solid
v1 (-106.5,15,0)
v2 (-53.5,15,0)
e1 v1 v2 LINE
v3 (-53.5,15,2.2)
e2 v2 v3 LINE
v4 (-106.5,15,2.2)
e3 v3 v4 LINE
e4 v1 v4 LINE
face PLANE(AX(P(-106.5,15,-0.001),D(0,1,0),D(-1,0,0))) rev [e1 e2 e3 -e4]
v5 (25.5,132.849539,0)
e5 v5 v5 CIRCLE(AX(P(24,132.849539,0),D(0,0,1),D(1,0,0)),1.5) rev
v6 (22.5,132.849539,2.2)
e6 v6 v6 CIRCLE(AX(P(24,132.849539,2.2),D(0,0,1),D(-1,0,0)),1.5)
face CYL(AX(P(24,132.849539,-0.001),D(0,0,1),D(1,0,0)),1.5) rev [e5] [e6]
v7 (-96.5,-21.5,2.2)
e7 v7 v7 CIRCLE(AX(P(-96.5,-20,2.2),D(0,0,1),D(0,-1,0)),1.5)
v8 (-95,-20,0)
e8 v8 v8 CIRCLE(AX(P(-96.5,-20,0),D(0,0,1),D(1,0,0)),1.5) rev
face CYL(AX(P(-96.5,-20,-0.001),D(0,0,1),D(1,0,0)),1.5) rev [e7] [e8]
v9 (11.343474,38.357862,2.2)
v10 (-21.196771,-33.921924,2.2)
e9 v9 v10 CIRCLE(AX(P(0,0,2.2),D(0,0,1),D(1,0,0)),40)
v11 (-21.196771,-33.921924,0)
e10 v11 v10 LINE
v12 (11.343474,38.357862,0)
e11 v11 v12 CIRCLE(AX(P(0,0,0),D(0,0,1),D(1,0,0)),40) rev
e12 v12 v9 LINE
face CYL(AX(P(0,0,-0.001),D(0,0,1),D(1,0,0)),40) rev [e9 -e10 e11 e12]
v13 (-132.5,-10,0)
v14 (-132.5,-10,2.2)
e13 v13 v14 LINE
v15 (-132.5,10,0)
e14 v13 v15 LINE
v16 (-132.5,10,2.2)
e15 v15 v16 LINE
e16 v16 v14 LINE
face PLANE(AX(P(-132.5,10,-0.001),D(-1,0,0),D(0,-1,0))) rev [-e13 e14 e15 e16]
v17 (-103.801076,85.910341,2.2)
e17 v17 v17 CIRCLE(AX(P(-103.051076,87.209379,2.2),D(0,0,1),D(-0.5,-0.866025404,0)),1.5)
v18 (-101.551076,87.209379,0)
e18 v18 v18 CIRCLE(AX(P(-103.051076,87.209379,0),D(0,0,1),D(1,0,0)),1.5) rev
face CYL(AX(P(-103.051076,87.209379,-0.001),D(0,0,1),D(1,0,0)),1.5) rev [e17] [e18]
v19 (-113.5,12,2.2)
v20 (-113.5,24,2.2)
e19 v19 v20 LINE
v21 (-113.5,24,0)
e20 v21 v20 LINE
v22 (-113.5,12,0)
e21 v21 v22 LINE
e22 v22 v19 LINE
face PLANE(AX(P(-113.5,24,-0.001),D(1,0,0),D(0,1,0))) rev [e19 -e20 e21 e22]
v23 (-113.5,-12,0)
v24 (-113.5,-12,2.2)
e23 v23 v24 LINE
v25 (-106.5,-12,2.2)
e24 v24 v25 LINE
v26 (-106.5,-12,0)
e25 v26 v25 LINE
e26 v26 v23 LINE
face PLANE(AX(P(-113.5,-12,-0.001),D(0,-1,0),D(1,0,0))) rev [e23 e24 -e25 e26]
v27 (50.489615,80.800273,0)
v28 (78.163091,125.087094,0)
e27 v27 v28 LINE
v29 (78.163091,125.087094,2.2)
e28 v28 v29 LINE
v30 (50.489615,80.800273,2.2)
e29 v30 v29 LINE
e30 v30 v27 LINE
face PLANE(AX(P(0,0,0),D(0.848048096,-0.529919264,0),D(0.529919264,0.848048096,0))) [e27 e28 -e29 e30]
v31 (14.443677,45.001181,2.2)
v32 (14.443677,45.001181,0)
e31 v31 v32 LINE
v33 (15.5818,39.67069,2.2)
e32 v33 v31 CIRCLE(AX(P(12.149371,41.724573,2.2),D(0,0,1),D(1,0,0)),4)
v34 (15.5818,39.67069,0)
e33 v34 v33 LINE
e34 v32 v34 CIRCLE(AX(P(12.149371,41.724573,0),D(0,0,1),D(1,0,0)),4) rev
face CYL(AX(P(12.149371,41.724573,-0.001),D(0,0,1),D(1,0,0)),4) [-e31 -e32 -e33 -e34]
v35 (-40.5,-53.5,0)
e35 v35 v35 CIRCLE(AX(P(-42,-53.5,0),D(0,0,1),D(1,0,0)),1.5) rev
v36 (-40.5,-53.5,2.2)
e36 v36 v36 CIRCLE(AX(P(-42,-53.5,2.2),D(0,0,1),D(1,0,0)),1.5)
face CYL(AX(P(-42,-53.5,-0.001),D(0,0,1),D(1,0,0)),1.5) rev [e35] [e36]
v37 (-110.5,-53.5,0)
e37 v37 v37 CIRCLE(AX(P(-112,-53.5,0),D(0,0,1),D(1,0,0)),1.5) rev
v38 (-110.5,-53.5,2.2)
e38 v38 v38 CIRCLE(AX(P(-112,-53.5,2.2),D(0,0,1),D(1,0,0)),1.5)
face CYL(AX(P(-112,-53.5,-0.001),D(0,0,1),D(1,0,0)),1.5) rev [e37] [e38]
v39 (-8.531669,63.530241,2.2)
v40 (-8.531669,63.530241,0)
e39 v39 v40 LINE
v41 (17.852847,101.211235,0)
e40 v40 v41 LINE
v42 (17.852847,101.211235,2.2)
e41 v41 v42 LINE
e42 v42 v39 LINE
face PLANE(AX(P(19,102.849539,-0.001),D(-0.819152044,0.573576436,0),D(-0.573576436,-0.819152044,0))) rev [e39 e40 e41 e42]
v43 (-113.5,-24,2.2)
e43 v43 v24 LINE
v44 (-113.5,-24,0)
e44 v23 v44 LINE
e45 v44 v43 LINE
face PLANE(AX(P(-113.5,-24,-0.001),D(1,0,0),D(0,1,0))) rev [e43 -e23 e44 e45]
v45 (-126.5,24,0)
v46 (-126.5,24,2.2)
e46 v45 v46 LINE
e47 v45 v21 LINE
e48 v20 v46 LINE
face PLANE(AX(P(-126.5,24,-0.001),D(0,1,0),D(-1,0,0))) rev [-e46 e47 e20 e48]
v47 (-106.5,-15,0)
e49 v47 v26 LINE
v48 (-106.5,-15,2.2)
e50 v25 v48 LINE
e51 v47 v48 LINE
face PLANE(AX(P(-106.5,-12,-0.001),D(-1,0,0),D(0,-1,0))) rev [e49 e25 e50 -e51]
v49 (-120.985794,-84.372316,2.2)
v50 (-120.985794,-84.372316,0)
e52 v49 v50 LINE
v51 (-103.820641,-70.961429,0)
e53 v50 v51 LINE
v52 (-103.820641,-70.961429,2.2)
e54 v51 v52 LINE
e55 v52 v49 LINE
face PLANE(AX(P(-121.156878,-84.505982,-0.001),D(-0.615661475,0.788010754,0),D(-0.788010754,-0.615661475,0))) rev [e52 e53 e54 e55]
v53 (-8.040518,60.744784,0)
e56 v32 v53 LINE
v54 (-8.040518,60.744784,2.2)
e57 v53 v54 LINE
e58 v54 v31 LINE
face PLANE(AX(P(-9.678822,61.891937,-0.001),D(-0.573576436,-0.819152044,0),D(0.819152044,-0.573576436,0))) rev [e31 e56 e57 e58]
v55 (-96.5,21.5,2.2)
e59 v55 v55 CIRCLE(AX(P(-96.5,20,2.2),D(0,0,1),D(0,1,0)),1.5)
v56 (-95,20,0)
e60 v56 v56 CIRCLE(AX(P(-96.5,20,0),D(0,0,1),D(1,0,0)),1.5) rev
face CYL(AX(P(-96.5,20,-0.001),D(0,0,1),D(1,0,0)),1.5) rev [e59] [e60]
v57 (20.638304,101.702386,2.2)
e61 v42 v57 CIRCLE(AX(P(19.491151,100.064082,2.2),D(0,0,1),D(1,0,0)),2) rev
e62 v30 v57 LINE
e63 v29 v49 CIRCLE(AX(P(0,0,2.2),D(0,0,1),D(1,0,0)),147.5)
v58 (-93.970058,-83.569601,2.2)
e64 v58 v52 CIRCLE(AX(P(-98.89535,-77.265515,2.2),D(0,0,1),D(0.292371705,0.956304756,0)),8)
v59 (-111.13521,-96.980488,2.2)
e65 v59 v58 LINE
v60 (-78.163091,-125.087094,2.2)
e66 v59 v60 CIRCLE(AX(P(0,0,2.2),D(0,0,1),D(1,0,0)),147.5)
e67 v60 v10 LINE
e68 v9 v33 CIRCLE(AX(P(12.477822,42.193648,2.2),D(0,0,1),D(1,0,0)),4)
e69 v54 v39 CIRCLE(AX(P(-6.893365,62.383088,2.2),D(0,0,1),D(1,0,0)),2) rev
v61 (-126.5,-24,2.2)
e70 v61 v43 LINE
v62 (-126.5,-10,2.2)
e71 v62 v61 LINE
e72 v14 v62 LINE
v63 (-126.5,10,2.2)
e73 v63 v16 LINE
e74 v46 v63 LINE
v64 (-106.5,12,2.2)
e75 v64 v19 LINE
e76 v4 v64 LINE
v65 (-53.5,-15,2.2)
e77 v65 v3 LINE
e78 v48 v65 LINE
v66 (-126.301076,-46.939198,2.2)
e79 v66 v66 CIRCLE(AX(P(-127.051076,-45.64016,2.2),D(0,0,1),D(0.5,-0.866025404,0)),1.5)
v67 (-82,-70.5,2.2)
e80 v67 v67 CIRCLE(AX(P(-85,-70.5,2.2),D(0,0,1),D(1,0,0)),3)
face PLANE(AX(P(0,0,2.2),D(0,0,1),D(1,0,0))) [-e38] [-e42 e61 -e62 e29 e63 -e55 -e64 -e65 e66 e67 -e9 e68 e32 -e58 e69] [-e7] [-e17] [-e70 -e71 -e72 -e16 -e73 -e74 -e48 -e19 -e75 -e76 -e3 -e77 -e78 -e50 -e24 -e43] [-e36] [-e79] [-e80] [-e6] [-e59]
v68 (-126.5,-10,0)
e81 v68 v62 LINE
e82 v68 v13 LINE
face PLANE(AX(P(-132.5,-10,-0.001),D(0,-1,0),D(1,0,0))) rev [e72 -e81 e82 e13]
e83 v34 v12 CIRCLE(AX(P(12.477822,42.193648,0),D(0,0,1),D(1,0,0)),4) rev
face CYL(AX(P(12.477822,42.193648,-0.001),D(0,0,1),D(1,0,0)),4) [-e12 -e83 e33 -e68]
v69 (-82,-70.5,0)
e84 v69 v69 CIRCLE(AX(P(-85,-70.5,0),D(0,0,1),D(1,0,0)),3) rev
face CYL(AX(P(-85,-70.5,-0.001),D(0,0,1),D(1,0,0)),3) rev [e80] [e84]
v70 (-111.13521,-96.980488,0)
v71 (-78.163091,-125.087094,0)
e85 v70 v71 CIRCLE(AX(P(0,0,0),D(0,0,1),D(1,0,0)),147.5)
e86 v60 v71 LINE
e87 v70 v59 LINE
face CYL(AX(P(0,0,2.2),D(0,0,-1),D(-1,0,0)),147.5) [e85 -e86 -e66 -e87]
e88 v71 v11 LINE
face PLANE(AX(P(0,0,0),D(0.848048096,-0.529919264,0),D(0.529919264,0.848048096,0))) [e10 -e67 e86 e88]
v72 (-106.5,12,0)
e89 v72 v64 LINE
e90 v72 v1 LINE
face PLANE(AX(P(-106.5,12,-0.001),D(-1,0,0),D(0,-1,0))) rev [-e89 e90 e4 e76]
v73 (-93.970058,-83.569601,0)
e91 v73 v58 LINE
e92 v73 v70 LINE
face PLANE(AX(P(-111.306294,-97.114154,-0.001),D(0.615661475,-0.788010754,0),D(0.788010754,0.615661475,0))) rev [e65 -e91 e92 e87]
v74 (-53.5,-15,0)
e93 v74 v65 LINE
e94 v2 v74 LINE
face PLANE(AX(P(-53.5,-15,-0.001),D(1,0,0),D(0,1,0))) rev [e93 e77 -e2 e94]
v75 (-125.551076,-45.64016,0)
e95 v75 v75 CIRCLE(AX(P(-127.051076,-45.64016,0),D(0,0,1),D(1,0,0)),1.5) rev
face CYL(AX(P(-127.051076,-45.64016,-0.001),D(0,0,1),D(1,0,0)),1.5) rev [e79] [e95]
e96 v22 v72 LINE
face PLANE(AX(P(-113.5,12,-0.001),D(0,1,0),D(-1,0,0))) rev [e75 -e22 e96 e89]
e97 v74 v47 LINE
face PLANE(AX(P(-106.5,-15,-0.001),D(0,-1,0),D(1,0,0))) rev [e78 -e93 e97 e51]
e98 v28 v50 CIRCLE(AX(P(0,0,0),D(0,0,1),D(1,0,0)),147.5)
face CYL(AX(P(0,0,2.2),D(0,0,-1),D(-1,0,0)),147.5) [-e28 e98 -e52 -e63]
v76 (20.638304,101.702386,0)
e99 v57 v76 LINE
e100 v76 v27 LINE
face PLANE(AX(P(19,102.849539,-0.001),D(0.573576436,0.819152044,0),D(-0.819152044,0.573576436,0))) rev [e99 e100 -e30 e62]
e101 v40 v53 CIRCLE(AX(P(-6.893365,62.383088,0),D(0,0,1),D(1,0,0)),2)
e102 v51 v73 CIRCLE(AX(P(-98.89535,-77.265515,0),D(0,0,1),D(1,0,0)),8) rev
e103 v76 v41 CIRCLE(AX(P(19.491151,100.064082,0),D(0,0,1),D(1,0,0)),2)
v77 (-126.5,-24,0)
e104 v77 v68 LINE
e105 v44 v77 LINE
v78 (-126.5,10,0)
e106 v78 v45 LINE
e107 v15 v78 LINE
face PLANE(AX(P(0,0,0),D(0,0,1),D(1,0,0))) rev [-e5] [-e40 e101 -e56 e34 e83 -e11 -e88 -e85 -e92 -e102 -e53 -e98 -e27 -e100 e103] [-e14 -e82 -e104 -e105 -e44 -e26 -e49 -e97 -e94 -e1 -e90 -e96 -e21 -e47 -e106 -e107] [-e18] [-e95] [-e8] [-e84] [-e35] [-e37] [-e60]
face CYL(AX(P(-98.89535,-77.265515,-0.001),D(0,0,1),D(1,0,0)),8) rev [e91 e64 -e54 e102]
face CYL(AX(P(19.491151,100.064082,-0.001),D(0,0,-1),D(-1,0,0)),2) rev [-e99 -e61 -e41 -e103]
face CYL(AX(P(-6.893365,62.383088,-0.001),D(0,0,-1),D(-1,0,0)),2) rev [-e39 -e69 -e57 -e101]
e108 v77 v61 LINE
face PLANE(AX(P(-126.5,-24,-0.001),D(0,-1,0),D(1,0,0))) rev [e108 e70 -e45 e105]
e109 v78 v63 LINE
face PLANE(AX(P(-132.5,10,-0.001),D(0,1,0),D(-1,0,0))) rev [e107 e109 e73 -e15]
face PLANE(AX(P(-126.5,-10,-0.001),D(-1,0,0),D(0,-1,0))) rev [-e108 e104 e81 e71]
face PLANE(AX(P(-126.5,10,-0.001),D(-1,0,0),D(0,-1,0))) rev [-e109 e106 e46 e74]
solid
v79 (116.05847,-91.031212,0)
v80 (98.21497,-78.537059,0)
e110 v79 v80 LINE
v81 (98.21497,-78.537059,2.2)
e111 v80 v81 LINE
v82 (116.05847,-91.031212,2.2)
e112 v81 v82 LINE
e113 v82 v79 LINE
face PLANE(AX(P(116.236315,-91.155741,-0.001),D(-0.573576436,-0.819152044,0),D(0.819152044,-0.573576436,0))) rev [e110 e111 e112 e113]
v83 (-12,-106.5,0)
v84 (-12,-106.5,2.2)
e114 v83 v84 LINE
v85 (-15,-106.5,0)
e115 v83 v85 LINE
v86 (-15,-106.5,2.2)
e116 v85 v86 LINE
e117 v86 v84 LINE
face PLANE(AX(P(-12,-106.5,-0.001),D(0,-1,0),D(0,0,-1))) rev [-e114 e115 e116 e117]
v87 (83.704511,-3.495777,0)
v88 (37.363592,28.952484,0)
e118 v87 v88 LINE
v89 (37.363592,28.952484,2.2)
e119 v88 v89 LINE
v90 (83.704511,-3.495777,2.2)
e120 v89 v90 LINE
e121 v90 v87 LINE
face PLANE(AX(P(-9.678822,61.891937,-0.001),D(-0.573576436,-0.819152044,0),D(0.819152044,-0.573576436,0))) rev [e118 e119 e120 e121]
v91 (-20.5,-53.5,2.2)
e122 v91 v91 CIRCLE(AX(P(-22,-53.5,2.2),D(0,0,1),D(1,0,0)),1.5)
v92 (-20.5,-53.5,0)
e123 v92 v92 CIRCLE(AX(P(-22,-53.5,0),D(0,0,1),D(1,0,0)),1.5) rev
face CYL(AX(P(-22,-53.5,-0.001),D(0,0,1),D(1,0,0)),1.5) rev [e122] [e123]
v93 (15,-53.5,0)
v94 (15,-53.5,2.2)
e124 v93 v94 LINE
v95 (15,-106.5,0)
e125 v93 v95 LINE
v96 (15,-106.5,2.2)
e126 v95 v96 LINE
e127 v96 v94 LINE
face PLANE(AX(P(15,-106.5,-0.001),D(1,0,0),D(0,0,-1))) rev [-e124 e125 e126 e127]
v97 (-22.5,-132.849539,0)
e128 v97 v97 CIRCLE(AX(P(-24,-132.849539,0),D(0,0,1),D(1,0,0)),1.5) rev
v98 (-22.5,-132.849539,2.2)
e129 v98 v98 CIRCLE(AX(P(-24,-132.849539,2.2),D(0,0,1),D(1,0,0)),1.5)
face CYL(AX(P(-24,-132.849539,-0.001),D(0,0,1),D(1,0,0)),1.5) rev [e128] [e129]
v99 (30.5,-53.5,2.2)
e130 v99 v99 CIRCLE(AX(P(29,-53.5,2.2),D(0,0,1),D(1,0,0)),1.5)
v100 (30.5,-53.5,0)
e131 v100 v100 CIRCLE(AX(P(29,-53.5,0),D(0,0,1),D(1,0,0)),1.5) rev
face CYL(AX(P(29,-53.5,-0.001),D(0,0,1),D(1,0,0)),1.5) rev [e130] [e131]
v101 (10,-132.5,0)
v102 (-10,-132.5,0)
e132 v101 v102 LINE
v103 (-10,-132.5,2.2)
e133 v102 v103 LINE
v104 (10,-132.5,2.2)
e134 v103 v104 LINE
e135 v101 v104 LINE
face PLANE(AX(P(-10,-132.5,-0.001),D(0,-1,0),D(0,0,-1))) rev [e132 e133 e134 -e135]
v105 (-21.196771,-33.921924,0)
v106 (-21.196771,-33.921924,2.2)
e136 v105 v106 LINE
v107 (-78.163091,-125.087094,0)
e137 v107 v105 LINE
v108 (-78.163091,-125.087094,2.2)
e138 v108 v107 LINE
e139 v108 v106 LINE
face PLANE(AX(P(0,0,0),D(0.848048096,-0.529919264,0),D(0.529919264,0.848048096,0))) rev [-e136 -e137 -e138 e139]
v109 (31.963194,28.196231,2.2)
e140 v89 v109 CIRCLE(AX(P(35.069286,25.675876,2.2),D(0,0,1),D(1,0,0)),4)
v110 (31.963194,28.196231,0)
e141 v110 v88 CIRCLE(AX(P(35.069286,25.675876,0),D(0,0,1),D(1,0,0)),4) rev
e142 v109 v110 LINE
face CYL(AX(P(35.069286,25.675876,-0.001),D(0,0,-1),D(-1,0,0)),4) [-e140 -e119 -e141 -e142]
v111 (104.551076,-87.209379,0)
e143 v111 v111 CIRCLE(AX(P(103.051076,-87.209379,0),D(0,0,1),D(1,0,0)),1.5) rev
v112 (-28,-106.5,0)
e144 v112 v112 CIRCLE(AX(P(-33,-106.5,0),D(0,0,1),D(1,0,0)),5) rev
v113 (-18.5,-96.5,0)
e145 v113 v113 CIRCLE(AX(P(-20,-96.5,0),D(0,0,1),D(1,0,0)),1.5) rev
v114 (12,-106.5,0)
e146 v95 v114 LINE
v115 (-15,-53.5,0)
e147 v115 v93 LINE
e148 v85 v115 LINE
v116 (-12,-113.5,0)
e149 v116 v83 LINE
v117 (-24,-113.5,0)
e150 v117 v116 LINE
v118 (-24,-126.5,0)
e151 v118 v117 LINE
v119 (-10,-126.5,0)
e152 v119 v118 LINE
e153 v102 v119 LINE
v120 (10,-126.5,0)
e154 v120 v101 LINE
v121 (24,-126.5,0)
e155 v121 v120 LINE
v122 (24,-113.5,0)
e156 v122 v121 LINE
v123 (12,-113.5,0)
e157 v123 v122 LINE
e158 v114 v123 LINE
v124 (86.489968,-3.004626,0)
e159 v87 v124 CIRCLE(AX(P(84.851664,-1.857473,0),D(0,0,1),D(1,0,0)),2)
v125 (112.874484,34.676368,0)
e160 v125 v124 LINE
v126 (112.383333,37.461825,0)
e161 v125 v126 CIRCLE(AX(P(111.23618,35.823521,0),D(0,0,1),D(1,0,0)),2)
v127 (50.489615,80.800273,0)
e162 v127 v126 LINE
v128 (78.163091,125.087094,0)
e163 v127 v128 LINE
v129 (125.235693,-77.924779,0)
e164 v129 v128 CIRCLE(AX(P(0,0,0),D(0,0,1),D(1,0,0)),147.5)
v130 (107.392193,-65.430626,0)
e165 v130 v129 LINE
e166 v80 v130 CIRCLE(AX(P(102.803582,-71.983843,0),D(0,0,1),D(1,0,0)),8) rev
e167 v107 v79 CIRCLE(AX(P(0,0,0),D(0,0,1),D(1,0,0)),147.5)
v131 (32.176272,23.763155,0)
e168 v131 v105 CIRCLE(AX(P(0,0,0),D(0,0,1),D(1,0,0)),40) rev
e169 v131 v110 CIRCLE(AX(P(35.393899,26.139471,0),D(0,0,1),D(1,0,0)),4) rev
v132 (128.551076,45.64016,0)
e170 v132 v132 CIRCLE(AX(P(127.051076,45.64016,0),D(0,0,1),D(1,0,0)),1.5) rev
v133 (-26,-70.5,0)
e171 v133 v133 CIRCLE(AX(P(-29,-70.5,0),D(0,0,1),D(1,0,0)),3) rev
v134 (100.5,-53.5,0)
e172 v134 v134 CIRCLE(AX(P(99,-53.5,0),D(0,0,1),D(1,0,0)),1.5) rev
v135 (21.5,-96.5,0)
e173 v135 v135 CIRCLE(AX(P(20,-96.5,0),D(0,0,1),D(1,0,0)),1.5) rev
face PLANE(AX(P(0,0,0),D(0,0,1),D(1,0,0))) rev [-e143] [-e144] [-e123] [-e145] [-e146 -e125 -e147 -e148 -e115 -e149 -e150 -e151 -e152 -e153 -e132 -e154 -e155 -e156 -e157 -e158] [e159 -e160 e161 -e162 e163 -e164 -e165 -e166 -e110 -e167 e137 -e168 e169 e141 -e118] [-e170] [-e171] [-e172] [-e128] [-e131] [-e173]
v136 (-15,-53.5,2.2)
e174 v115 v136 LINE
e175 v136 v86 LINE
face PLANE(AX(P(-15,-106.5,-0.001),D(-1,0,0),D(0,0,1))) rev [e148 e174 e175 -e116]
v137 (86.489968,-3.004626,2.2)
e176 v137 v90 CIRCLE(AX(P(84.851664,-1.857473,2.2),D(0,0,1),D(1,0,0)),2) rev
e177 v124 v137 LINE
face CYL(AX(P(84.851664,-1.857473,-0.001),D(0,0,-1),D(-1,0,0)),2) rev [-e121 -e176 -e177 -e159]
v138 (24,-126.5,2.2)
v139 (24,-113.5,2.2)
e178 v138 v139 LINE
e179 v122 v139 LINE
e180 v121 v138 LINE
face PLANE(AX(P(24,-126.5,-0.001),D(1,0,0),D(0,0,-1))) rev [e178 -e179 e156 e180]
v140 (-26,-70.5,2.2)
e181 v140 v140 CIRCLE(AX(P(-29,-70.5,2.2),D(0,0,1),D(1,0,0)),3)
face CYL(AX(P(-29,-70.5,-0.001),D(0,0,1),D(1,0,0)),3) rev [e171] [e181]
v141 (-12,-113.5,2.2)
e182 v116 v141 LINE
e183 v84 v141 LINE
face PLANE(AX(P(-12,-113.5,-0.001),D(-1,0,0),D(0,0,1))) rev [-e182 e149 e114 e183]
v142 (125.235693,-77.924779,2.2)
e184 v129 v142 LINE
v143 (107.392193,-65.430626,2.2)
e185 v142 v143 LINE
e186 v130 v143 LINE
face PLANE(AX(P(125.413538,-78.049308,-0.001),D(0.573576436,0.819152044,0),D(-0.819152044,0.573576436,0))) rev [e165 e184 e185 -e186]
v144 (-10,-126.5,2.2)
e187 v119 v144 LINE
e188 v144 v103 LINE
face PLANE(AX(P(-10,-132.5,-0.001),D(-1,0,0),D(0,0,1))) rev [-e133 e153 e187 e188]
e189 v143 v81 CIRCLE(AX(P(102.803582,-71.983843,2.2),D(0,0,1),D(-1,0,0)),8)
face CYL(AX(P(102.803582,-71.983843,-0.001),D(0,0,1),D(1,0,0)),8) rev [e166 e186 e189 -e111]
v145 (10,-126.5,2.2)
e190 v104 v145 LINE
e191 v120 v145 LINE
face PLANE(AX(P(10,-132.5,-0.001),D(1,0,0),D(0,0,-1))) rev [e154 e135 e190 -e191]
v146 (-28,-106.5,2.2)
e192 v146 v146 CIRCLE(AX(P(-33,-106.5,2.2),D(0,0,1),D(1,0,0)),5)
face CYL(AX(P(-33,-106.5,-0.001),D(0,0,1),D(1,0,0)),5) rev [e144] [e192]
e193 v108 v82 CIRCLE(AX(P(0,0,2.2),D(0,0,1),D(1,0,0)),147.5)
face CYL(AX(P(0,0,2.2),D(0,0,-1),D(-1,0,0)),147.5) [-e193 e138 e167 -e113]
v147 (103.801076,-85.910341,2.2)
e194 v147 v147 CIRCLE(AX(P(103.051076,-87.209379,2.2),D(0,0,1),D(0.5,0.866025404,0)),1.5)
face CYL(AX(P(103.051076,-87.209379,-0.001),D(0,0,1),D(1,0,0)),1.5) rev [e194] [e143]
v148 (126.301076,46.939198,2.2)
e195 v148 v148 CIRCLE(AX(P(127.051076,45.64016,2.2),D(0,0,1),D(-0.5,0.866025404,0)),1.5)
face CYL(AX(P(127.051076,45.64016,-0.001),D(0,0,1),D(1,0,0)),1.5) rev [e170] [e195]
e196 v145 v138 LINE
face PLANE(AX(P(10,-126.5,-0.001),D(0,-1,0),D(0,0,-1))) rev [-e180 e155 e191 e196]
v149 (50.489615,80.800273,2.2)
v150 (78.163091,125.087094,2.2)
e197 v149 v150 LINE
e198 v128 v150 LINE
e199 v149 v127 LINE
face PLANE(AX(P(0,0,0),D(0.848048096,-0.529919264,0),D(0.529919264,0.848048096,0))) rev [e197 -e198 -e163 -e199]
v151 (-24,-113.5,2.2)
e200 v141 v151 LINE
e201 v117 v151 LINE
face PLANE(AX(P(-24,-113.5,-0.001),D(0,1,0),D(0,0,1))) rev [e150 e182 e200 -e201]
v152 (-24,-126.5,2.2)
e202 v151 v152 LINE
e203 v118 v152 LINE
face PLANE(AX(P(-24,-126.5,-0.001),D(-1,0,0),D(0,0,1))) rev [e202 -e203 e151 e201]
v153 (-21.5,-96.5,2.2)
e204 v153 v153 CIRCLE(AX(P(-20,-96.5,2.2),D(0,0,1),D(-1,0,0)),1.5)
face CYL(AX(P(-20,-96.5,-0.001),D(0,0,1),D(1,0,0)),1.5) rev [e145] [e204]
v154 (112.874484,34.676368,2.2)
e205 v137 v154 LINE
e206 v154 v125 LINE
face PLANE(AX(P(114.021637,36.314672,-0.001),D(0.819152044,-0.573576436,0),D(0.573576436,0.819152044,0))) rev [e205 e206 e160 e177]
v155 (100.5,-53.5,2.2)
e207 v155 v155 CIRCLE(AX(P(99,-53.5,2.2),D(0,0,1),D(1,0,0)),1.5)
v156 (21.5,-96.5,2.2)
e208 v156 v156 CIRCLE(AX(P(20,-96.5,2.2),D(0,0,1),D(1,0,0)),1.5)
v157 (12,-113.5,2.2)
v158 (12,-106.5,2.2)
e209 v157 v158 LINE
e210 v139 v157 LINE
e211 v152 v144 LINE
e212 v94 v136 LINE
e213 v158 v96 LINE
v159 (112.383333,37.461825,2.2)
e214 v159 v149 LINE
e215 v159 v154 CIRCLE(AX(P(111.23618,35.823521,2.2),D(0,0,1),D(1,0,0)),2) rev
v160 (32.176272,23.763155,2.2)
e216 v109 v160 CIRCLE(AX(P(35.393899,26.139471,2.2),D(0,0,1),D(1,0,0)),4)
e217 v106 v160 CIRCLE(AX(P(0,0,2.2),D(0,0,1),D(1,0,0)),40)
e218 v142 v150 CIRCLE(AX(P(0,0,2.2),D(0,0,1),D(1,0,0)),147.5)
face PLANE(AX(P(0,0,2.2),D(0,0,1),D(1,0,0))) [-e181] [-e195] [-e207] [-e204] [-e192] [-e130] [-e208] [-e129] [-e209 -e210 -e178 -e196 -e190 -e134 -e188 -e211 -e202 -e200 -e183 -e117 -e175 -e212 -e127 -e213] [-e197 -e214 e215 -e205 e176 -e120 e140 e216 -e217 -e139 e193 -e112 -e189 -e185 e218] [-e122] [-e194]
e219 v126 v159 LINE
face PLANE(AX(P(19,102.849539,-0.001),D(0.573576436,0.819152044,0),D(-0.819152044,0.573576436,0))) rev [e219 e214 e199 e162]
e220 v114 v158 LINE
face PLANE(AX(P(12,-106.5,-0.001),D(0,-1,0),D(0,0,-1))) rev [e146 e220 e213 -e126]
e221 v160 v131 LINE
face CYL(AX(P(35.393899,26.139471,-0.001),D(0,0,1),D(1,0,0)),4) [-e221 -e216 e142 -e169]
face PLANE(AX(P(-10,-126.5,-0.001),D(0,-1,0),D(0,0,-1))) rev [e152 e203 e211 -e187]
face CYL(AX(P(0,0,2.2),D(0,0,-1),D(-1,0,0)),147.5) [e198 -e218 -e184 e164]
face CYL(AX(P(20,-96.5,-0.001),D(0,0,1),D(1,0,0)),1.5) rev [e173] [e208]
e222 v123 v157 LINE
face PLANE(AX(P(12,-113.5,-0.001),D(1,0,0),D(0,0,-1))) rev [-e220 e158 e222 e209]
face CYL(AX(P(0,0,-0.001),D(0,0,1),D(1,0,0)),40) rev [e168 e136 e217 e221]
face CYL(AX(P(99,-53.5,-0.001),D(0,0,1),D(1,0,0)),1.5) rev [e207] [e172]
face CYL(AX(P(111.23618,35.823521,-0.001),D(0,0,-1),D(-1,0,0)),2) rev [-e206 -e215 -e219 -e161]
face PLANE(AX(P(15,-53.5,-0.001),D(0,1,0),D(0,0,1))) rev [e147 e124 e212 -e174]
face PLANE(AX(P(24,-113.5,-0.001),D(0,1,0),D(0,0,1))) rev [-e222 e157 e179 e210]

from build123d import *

# Parameters (mm, degrees)
SKETCH1_R           = 147.5
BOSS_EXTRUDE1_DEPTH = 2.2
CUT_EXTRUDE1_REACH  = 210.608
CUT_EXTRUDE2_REACH  = 210.608
SKETCH3_R           = 1.5
CIRPATTERN2_COUNT   = 2
CIRPATTERN2_ANGLE   = 90
CUT_EXTRUDE3_REACH  = 210.608
SKETCH4_R           = 1.5
CIRPATTERN3_COUNT   = 6
CUT_EXTRUDE4_REACH  = 210.608
SKETCH5_R           = 40
CUT_EXTRUDE5_REACH  = 210.608
SKETCH6_R           = 5
CUT_EXTRUDE6_REACH  = 210.608
SKETCH7_R           = 3
CUT_EXTRUDE7_REACH  = 210.608
SKETCH8_R           = 1.5
CUT_EXTRUDE8_REACH  = 210.608
CIRPATTERN4_COUNT   = 2
CIRPATTERN4_ANGLE   = 107
CUT_EXTRUDE9_REACH  = 210.608
CUT_EXTRUDE10_REACH = 210.608
FILLET2_R           = 4
FILLET3_R           = 2


# Read off the part's stored shape, not the designer's step: Split1
with BuildPart() as part:
    # Sketch1 → Boss-Extrude1 (new body)
    with BuildSketch(Plane.XY):
        Circle(SKETCH1_R)
    extrude(amount=BOSS_EXTRUDE1_DEPTH)

    # Sketch2 → Cut-Extrude1 (cut, up to next)
    with BuildSketch(Plane.XY.offset(2.2), mode=Mode.PRIVATE) as cut_extrude1_sk1:
        Polygon((-10, -132.5), (10, -132.5), (10, -126.5), (24, -126.5), (24, -113.5), (12, -113.5), (12, -106.5), (15, -106.5), (15, -53.5), (-15, -53.5), (-15, -106.5), (-12, -106.5), (-12, -113.5), (-24, -113.5), (-24, -126.5), (-10, -126.5), align=None)
    cut_extrude1_tool1 = extrude(cut_extrude1_sk1.sketch, amount=-CUT_EXTRUDE1_REACH, mode=Mode.PRIVATE) & part.part
    cut_extrude1 = cut_extrude1_tool1.solids().sort_by_distance((0, -94.364508, 2.2))[0]
    add(cut_extrude1, mode=Mode.SUBTRACT)

    # Sketch3 → Cut-Extrude2 (cut, up to next)
    with BuildSketch(Plane.XY.offset(2.2), mode=Mode.PRIVATE) as cut_extrude2_sk1:
        with Locations((20, -96.5)):
            Circle(SKETCH3_R)
    cut_extrude2_tool1 = extrude(cut_extrude2_sk1.sketch, amount=-CUT_EXTRUDE2_REACH, mode=Mode.PRIVATE) & part.part
    # Sketch3 → Cut-Extrude2 (cut, up to next)
    with BuildSketch(Plane.XY.offset(2.2), mode=Mode.PRIVATE) as cut_extrude2_sk2:
        with Locations((-20, -96.5)):
            Circle(SKETCH3_R)
    cut_extrude2_tool2 = extrude(cut_extrude2_sk2.sketch, amount=-CUT_EXTRUDE2_REACH, mode=Mode.PRIVATE) & part.part
    cut_extrude2_1 = cut_extrude2_tool1.solids().sort_by_distance((20, -96.5, 2.2))[0]
    add(cut_extrude2_1, mode=Mode.SUBTRACT)
    cut_extrude2_2 = cut_extrude2_tool2.solids().sort_by_distance((-20, -96.5, 2.2))[0]
    add(cut_extrude2_2, mode=Mode.SUBTRACT)
    cut_extrude2 = cut_extrude2_1 + cut_extrude2_2  # Cut-Extrude2 as one shape, for the pattern or mirror that repeats it

    # CirPattern2: Cut-Extrude1, Cut-Extrude2 ×2 about axis
    cirpattern2_axis = Axis((0, 0, 0), (0, 0, -1))
    add([cut_extrude1.rotate(cirpattern2_axis, i * CIRPATTERN2_ANGLE / (CIRPATTERN2_COUNT - 1)) for i in range(1, CIRPATTERN2_COUNT)], mode=Mode.SUBTRACT)
    add([cut_extrude2.rotate(cirpattern2_axis, i * CIRPATTERN2_ANGLE / (CIRPATTERN2_COUNT - 1)) for i in range(1, CIRPATTERN2_COUNT)], mode=Mode.SUBTRACT)

    # Sketch4 → Cut-Extrude3 (cut, up to next)
    with BuildSketch(Plane.XY.offset(2.2), mode=Mode.PRIVATE) as cut_extrude3_sk1:
        with Locations((-24, -132.849538953)):
            Circle(SKETCH4_R)
    cut_extrude3_tool1 = extrude(cut_extrude3_sk1.sketch, amount=-CUT_EXTRUDE3_REACH, mode=Mode.PRIVATE) & part.part
    cut_extrude3 = cut_extrude3_tool1.solids().sort_by_distance((-24, -132.849539, 2.2))[0]
    add(cut_extrude3, mode=Mode.SUBTRACT)

    # CirPattern3: Cut-Extrude3 ×6 about axis
    cirpattern3_axis = Axis((0, 0, 0), (0, 0, 1))
    for i in range(1, CIRPATTERN3_COUNT):
        add(cut_extrude3.rotate(cirpattern3_axis, i * 360 / CIRPATTERN3_COUNT), mode=Mode.SUBTRACT)

    # Sketch5 → Cut-Extrude4 (cut, up to next)
    with BuildSketch(Plane.XY.offset(2.2), mode=Mode.PRIVATE) as cut_extrude4_sk1:
        Circle(SKETCH5_R)
    cut_extrude4_tool1 = extrude(cut_extrude4_sk1.sketch, amount=-CUT_EXTRUDE4_REACH, mode=Mode.PRIVATE) & part.part
    add(cut_extrude4_tool1.solids().sort_by_distance((0, 0, 2.2))[0], mode=Mode.SUBTRACT)

    # Sketch6 → Cut-Extrude5 (cut, up to next)
    with BuildSketch(Plane.XY.offset(2.2), mode=Mode.PRIVATE) as cut_extrude5_sk1:
        with Locations((-33, -106.5)):
            Circle(SKETCH6_R)
    cut_extrude5_tool1 = extrude(cut_extrude5_sk1.sketch, amount=-CUT_EXTRUDE5_REACH, mode=Mode.PRIVATE) & part.part
    add(cut_extrude5_tool1.solids().sort_by_distance((-33, -106.5, 2.2))[0], mode=Mode.SUBTRACT)

    # Sketch7 → Cut-Extrude6 (cut, up to next)
    with BuildSketch(Plane.XY.offset(2.2), mode=Mode.PRIVATE) as cut_extrude6_sk1:
        with Locations((-29, -70.5)):
            Circle(SKETCH7_R)
    cut_extrude6_tool1 = extrude(cut_extrude6_sk1.sketch, amount=-CUT_EXTRUDE6_REACH, mode=Mode.PRIVATE) & part.part
    # Sketch7 → Cut-Extrude6 (cut, up to next)
    with BuildSketch(Plane.XY.offset(2.2), mode=Mode.PRIVATE) as cut_extrude6_sk2:
        with Locations((-85, -70.5)):
            Circle(SKETCH7_R)
    cut_extrude6_tool2 = extrude(cut_extrude6_sk2.sketch, amount=-CUT_EXTRUDE6_REACH, mode=Mode.PRIVATE) & part.part
    add(cut_extrude6_tool1.solids().sort_by_distance((-29, -70.5, 2.2))[0], mode=Mode.SUBTRACT)
    add(cut_extrude6_tool2.solids().sort_by_distance((-85, -70.5, 2.2))[0], mode=Mode.SUBTRACT)

    # Sketch8 → Cut-Extrude7 (cut, up to next)
    with BuildSketch(Plane.XY.offset(2.2), mode=Mode.PRIVATE) as cut_extrude7_sk1:
        with Locations((29, -53.5)):
            Circle(SKETCH8_R)
    cut_extrude7_tool1 = extrude(cut_extrude7_sk1.sketch, amount=-CUT_EXTRUDE7_REACH, mode=Mode.PRIVATE) & part.part
    # Sketch8 → Cut-Extrude7 (cut, up to next)
    with BuildSketch(Plane.XY.offset(2.2), mode=Mode.PRIVATE) as cut_extrude7_sk2:
        with Locations((99, -53.5)):
            Circle(SKETCH8_R)
    cut_extrude7_tool2 = extrude(cut_extrude7_sk2.sketch, amount=-CUT_EXTRUDE7_REACH, mode=Mode.PRIVATE) & part.part
    # Sketch8 → Cut-Extrude7 (cut, up to next)
    with BuildSketch(Plane.XY.offset(2.2), mode=Mode.PRIVATE) as cut_extrude7_sk3:
        with Locations((-22, -53.5)):
            Circle(SKETCH8_R)
    cut_extrude7_tool3 = extrude(cut_extrude7_sk3.sketch, amount=-CUT_EXTRUDE7_REACH, mode=Mode.PRIVATE) & part.part
    # Sketch8 → Cut-Extrude7 (cut, up to next)
    with BuildSketch(Plane.XY.offset(2.2), mode=Mode.PRIVATE) as cut_extrude7_sk4:
        with Locations((-42, -53.5)):
            Circle(SKETCH8_R)
    cut_extrude7_tool4 = extrude(cut_extrude7_sk4.sketch, amount=-CUT_EXTRUDE7_REACH, mode=Mode.PRIVATE) & part.part
    # Sketch8 → Cut-Extrude7 (cut, up to next)
    with BuildSketch(Plane.XY.offset(2.2), mode=Mode.PRIVATE) as cut_extrude7_sk5:
        with Locations((-112, -53.5)):
            Circle(SKETCH8_R)
    cut_extrude7_tool5 = extrude(cut_extrude7_sk5.sketch, amount=-CUT_EXTRUDE7_REACH, mode=Mode.PRIVATE) & part.part
    add(cut_extrude7_tool1.solids().sort_by_distance((29, -53.5, 2.2))[0], mode=Mode.SUBTRACT)
    add(cut_extrude7_tool2.solids().sort_by_distance((99, -53.5, 2.2))[0], mode=Mode.SUBTRACT)
    add(cut_extrude7_tool3.solids().sort_by_distance((-22, -53.5, 2.2))[0], mode=Mode.SUBTRACT)
    add(cut_extrude7_tool4.solids().sort_by_distance((-42, -53.5, 2.2))[0], mode=Mode.SUBTRACT)
    add(cut_extrude7_tool5.solids().sort_by_distance((-112, -53.5, 2.2))[0], mode=Mode.SUBTRACT)

    # Sketch9 → Cut-Extrude8 (cut, up to next)
    with BuildSketch(Plane.XY.offset(2.2), mode=Mode.PRIVATE) as cut_extrude8_sk1:
        with BuildLine():
            Line((116.236315042, -91.155740716), (125.413538023, -78.049308007))
            Line((125.413538023, -78.049308007), (107.392193049, -65.430626408))
            ThreePointArc((107.392193049, -65.430626408), (96.250365204, -67.395231271), (98.214970067, -78.537059116))
            Line((98.214970067, -78.537059116), (116.236315042, -91.155740716))
        make_face()
    cut_extrude8_tool1 = extrude(cut_extrude8_sk1.sketch, amount=-CUT_EXTRUDE8_REACH, mode=Mode.PRIVATE) & part.part
    cut_extrude8 = cut_extrude8_tool1.solids().sort_by_distance((109.194642, -76.458912, 2.2))[0]
    add(cut_extrude8, mode=Mode.SUBTRACT)

    # CirPattern4: Cut-Extrude8 ×2 about axis
    cirpattern4_axis = Axis((0, 0, 0), (0, 0, -1))
    for i in range(1, CIRPATTERN4_COUNT):
        add(cut_extrude8.rotate(cirpattern4_axis, i * CIRPATTERN4_ANGLE / (CIRPATTERN4_COUNT - 1)), mode=Mode.SUBTRACT)

    # Sketch10 → Cut-Extrude9 (cut, up to next)
    with BuildSketch(Plane.XY.offset(2.2), mode=Mode.PRIVATE) as cut_extrude9_sk1:
        Polygon((19, 102.849538953), (114.021637138, 36.314672336), (85.34281532, -4.642929878), (-9.678821818, 61.891936738), align=None)
    cut_extrude9_tool1 = extrude(cut_extrude9_sk1.sketch, amount=-CUT_EXTRUDE9_REACH, mode=Mode.PRIVATE) & part.part
    add(cut_extrude9_tool1.solids().sort_by_distance((52.171408, 49.103305, 2.2))[0], mode=Mode.SUBTRACT)

    # Sketch11 → Cut-Extrude10 (cut, up to next)
    with BuildSketch(Plane.XY.offset(2.2), mode=Mode.PRIVATE) as cut_extrude10_sk1:
        with BuildLine():
            Line((25.942740388, 37.050072974), (17.720285388, 42.706875333))
            Line((17.720285388, 42.706875333), (13.995022634, 37.386648757))
            ThreePointArc((13.995022634, 37.386648757), (22.905723673, 32.694800608), (30.358763136, 25.922339104))
            Line((30.358763136, 25.922339104), (34.086983666, 31.246789823))
            Line((34.086983666, 31.246789823), (25.942740388, 37.050072974))
        make_face()
    cut_extrude10_tool1 = extrude(cut_extrude10_sk1.sketch, amount=-CUT_EXTRUDE10_REACH, mode=Mode.PRIVATE) & part.part
    add(cut_extrude10_tool1.solids().sort_by_distance((24.289754, 34.669417, 2.2))[0], mode=Mode.SUBTRACT)

    # Fillet2
    # the kernel refuses this fillet: 4 mm, written as the material it takes off along each edge
    with BuildSketch(Plane(origin=(30.406040301, 25.989857892, -7.458684418), x_dir=(0.5735764363510447, 0.8191520442889928, 0), z_dir=(0, 0, 1))) as fillet2_piece_1:
        with BuildLine():
            CenterArc((2.983473767, -4), FILLET2_R, 90, 71.446995465)
            ThreePointArc((-0.808645072, -2.727272727), (-0.380070857, -1.370827064), (0, 0))
            Line((0, 0), (2.983473767, 0))
        make_face()
    extrude(amount=17.117368836, mode=Mode.SUBTRACT)
    with BuildSketch(Plane(origin=(34.086983666, 31.246789823, 12.2), x_dir=(-0.5735764363510458, -0.819152044288992, 0), z_dir=(0, 0, -1)), Plane(origin=(17.720285388, 42.706875333, 12.2), x_dir=(-0.8191520442889926, 0.5735764363510452, 0), z_dir=(0, 0, -1))) as fillet2_piece_2:
        with BuildLine():
            CenterArc((FILLET2_R, -FILLET2_R), FILLET2_R, 90, 90)
            Line((0, -FILLET2_R), (0, 0))
            Line((0, 0), (FILLET2_R, 0))
        make_face()
    extrude(amount=22.2, mode=Mode.SUBTRACT)
    with BuildSketch(Plane(origin=(14.042293504, 37.454158556, -7.462546567), x_dir=(0.5735764363510463, 0.8191520442889917, 0), z_dir=(0, 0, 1))) as fillet2_piece_3:
        with BuildLine():
            CenterArc((2.985018627, 4), FILLET2_R, 198.525603309, 71.474396691)
            ThreePointArc((-0.80770845, 2.729086422), (-0.379573844, 1.371729304), (0, 0))
            Line((0, 0), (2.985018627, 0))
        make_face()
    extrude(amount=17.125093133, mode=Mode.SUBTRACT)

    # Fillet3
    fillet3_edges = [part.edges().sort_by_distance(p)[0] for p in [
        (114.021637138, 36.314672336, 1.1),
        (85.34281532, -4.642929878, 1.1),
        (-9.678821818, 61.891936738, 1.1),
        (19, 102.849538953, 1.1),
    ]]
    fillet(fillet3_edges, radius=FILLET3_R)


with BuildPart() as body_2:
    # Split1: the piece on the far side of the plane
    add(part.part)
    split(bisect_by=Plane(origin=(0, 0, 0), x_dir=(0.5299192642332059, 0.8480480961564255, 0), z_dir=(0.8480480961564253, -0.5299192642332062, 0)), keep=Keep.BOTTOM)


with BuildPart() as part_1:
    add(part.part)

    # Split1
    split(bisect_by=Plane(origin=(0, 0, 0), x_dir=(0.5299192642332059, 0.8480480961564255, 0), z_dir=(0.8480480961564253, -0.5299192642332062, 0)), keep=Keep.TOP)


solid = Compound([body_2.part, part_1.part])
